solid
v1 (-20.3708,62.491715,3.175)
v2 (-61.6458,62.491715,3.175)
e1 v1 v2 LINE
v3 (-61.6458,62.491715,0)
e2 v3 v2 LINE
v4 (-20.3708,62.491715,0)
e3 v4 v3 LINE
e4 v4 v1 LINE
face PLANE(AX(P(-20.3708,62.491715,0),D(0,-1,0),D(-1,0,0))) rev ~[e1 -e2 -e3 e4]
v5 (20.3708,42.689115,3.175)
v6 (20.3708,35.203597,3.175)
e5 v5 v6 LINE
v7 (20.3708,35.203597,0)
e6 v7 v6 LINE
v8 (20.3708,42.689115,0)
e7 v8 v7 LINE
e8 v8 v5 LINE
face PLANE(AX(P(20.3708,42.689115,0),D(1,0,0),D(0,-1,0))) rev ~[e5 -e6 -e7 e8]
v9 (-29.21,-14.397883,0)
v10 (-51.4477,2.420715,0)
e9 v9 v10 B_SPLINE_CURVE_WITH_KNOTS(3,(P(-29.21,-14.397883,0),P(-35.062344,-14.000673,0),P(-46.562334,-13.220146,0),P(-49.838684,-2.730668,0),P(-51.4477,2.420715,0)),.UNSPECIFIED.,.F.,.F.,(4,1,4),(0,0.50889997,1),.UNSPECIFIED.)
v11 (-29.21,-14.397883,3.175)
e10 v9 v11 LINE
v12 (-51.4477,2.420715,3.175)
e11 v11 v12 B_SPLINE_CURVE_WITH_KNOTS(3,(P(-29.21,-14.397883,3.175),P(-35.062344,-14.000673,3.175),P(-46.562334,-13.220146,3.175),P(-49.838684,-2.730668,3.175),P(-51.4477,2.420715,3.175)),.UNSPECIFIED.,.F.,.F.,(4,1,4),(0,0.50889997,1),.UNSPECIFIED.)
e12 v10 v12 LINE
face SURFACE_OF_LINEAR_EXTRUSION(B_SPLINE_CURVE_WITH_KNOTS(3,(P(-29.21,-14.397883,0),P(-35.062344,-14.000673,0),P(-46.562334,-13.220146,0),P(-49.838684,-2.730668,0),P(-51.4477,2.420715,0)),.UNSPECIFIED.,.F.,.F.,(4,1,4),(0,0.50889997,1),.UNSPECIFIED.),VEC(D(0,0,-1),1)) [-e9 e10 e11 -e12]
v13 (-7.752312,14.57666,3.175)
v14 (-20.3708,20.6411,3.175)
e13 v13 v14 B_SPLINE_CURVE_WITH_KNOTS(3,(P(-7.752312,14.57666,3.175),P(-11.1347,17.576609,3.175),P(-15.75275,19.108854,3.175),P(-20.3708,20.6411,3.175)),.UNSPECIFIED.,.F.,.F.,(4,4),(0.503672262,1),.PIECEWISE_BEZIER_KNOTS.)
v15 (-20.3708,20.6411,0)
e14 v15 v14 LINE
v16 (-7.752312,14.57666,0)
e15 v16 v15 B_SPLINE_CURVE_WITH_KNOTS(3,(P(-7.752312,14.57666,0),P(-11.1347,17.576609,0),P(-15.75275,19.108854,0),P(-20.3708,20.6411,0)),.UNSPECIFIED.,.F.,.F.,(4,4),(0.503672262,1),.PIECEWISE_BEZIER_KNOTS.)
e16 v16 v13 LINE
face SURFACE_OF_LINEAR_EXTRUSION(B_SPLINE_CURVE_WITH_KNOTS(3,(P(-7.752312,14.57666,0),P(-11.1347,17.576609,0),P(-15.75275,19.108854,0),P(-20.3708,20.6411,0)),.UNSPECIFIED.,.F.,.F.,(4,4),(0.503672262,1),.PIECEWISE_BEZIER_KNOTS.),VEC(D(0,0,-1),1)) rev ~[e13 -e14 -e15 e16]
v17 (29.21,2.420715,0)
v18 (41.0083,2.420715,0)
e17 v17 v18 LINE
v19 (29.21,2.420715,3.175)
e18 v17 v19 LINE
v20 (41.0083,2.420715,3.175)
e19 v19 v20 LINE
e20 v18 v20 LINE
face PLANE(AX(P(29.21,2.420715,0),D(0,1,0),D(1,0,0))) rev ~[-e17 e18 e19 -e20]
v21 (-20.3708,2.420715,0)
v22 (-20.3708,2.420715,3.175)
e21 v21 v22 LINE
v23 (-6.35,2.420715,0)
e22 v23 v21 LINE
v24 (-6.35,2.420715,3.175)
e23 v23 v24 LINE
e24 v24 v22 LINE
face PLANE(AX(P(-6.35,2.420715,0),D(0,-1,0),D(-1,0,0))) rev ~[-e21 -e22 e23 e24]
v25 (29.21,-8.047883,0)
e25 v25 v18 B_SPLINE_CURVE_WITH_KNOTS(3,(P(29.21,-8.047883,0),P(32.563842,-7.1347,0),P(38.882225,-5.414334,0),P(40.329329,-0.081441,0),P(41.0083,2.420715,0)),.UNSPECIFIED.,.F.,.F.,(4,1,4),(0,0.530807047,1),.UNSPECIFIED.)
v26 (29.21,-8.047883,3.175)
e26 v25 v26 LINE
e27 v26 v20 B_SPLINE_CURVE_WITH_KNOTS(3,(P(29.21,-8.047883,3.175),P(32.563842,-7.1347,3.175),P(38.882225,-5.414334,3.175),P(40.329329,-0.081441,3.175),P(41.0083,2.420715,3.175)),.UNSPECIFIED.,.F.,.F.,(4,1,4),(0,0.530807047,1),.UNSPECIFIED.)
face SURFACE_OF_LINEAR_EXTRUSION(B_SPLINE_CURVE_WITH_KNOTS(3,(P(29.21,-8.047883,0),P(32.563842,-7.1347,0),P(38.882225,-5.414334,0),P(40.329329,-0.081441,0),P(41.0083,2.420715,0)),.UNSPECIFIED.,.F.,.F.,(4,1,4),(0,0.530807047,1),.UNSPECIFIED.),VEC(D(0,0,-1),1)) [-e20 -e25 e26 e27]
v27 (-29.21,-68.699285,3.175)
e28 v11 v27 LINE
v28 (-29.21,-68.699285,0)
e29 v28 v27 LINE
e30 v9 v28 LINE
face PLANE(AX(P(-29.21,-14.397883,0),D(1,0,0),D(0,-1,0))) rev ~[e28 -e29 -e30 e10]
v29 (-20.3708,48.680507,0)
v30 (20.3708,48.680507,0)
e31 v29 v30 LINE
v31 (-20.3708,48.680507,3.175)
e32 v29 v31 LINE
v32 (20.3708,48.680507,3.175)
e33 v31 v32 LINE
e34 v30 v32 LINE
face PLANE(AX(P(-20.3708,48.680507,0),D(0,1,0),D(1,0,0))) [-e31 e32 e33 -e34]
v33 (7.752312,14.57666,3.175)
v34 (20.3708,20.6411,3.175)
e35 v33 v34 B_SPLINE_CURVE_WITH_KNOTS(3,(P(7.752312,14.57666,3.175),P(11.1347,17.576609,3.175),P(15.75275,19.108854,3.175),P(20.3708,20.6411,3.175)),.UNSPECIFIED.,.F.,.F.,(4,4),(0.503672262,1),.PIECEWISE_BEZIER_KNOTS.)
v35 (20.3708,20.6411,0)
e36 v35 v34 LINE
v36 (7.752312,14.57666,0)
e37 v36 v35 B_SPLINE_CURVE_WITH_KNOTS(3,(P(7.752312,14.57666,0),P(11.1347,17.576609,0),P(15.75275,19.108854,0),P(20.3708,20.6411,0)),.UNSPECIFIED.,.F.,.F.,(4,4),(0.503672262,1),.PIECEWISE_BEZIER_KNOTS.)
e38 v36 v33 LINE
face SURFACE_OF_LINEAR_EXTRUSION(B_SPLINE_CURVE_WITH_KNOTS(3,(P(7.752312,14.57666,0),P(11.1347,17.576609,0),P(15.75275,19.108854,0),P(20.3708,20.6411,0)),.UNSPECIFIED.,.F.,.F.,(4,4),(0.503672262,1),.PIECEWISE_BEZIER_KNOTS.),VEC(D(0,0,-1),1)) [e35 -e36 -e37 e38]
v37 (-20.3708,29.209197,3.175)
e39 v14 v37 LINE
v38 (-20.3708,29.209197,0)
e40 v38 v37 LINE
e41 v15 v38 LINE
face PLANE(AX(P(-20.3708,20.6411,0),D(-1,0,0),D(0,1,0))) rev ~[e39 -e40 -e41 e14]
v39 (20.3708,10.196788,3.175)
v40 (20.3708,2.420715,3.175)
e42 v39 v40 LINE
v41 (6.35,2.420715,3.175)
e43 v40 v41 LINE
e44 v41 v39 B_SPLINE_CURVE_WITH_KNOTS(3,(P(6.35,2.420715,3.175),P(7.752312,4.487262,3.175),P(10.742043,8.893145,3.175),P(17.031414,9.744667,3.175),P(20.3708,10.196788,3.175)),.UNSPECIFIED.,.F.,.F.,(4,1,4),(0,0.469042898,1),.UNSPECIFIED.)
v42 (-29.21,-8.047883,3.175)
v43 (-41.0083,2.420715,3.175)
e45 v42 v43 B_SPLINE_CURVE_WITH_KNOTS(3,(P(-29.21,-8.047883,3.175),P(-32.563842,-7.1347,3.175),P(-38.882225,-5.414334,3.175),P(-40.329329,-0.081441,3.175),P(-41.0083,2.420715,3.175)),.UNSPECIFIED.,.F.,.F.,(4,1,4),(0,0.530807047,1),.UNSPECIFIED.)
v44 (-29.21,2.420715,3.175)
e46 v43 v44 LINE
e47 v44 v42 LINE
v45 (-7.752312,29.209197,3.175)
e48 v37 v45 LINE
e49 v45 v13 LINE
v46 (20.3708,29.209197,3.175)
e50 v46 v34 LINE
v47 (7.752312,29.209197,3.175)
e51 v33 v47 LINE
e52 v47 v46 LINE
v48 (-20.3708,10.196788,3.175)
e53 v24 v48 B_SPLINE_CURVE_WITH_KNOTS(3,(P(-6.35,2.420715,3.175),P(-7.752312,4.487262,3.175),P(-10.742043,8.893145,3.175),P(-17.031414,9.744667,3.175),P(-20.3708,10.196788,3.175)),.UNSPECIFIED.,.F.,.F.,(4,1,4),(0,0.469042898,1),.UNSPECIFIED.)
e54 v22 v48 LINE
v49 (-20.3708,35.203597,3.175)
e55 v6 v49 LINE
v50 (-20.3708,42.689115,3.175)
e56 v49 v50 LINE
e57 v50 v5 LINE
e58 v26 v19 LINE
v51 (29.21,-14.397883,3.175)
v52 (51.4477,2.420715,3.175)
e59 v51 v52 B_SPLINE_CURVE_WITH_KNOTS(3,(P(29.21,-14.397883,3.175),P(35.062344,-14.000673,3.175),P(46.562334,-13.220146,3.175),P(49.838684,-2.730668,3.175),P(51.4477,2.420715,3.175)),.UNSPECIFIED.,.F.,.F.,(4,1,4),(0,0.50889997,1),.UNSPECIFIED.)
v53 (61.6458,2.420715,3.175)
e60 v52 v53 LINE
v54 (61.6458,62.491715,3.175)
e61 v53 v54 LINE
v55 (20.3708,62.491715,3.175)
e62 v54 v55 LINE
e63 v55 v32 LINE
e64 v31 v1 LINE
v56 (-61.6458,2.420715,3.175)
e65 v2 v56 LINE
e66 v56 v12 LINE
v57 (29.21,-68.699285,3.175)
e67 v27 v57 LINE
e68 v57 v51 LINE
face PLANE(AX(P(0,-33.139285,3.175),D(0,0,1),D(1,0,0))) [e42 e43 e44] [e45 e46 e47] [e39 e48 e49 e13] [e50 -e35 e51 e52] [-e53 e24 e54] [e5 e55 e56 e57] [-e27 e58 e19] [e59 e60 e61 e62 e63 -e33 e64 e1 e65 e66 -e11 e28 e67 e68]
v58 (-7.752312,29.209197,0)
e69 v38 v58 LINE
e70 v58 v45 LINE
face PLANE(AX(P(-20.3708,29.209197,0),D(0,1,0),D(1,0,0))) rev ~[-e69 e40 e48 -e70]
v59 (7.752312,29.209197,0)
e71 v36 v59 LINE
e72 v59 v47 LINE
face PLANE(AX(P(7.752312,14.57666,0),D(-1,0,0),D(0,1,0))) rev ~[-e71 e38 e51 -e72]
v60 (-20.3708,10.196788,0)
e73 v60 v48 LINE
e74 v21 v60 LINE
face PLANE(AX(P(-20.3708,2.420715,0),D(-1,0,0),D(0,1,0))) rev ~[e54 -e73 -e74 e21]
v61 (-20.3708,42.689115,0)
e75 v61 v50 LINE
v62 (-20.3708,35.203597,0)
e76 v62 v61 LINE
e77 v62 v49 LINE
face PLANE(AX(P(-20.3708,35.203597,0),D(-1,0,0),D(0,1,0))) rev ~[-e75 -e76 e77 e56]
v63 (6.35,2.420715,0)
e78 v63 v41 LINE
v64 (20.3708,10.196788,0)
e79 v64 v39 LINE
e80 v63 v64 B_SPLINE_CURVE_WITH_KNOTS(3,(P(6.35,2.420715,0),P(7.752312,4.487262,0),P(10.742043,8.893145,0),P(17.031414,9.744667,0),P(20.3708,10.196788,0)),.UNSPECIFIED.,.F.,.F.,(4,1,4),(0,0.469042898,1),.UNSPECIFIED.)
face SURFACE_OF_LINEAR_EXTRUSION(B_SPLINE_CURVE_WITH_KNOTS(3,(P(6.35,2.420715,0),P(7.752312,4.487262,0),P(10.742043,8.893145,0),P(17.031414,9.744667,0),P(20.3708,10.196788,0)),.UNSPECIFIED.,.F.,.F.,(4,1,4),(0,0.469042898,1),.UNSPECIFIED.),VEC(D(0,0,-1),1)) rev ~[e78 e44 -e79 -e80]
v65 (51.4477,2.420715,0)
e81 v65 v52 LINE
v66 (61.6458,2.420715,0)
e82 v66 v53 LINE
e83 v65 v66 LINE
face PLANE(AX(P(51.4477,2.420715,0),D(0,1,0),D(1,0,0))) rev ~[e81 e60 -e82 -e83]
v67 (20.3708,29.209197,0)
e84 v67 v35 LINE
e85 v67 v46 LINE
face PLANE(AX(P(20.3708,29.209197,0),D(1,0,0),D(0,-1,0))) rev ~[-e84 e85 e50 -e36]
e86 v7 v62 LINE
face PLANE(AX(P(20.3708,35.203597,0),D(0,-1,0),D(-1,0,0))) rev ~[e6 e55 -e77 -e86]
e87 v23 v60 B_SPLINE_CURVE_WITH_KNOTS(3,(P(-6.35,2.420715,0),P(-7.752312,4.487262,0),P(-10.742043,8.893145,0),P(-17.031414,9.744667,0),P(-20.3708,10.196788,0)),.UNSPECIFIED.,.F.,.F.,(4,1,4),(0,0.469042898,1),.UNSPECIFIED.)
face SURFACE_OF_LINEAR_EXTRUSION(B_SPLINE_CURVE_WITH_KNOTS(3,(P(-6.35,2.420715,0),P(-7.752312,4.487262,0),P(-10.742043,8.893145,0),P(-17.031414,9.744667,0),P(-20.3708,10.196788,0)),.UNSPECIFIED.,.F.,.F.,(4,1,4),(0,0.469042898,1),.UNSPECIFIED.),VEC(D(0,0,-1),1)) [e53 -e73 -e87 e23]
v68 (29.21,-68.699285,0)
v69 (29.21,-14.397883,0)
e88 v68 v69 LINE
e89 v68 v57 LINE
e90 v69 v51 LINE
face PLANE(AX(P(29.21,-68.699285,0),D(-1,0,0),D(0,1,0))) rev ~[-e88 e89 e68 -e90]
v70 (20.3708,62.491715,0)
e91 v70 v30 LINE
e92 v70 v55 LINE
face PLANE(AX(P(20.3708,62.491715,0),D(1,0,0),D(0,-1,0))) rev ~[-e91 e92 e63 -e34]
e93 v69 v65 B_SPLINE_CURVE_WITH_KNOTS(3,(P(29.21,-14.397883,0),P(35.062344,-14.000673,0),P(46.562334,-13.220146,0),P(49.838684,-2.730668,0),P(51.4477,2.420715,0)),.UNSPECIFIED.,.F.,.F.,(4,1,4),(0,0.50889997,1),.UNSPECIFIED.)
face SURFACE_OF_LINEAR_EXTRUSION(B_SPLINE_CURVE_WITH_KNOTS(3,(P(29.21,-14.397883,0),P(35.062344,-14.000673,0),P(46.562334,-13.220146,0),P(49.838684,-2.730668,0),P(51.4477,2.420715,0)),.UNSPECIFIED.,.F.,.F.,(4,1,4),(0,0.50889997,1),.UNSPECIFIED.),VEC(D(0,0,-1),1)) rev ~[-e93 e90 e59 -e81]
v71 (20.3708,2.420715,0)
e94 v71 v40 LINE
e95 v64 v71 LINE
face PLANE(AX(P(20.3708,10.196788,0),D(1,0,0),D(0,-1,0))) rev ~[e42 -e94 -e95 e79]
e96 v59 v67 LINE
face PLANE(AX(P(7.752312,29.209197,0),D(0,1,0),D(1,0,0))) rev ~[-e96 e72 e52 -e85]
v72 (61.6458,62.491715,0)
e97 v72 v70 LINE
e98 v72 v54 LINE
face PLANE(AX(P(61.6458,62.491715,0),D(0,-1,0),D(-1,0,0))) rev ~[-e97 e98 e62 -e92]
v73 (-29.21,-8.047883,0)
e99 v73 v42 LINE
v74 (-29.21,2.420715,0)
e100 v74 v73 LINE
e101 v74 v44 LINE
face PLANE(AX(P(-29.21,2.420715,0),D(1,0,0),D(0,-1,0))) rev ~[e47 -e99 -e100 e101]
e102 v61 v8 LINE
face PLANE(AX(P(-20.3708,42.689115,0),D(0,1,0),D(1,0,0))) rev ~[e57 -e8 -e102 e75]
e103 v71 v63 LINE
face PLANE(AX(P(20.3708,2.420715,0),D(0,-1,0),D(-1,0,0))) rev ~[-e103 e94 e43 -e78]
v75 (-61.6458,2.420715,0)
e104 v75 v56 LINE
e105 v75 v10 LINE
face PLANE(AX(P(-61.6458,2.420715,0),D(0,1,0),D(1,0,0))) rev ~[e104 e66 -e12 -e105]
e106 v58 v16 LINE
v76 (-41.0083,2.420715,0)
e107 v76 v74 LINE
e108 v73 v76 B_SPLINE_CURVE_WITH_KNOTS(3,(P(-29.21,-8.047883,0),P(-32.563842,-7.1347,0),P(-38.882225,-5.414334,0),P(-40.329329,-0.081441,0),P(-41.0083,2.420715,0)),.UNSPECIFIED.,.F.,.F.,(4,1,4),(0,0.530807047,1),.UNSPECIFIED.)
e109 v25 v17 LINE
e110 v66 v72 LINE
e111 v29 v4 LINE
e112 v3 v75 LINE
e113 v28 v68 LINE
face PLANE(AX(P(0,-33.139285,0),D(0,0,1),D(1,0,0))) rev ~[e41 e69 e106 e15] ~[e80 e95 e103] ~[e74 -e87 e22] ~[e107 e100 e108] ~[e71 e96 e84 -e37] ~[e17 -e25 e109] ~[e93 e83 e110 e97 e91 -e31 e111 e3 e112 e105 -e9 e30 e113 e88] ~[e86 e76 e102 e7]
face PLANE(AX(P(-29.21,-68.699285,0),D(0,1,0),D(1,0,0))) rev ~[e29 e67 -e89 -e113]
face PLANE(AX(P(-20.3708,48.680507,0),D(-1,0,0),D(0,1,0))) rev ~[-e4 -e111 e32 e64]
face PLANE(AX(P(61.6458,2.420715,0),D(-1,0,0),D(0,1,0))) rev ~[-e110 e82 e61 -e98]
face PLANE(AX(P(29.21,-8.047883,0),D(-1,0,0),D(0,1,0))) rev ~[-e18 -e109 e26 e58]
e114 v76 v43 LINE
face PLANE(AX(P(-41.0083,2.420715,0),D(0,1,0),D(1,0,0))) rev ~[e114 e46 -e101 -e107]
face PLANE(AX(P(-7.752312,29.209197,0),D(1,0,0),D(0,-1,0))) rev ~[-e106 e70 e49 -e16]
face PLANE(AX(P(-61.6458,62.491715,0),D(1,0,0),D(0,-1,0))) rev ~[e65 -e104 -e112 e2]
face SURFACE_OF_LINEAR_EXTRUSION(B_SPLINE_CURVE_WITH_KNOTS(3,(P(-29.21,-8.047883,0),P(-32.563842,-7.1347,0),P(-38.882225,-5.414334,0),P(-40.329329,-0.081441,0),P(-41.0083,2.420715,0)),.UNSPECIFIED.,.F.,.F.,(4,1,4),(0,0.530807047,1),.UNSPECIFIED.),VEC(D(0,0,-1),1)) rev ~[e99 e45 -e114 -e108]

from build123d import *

# Parameters (mm, degrees)
F0_W     = 40.7416
F0_H     = 5.9913918376
F1_DEPTH = 3.175


# Not quite as in the source:
# - a feature names something its author has since deleted; it is built from what else it names


with BuildPart() as f1:
    # F0 (on Top) → F1 (new body)
    with BuildSketch(Plane.XY):
        Polygon((6.35, 2.420714612), (0, 2.420714612), (-6.35, 2.420714612), (-20.3708, 2.420714612), (-22.9107162118, 2.420714612), (-29.21, 2.420714612), (-29.21, -8.0478828564), (-29.21, -14.3978828564), (-29.21, -68.699285388), (29.21, -68.699285388), (29.21, -14.3978828564), (29.21, -8.0478828564), (29.21, 2.420714612), (20.3708, 2.420714612), align=None)
        Polygon((20.3708, 10.1967882365), (20.3708, 2.420714612), (29.21, 2.420714612), (41.0083, 2.420714612), (51.4477, 2.420714612), (61.6458, 2.420714612), (61.6458, 62.491714612), (20.3708, 62.491714612), (20.3708, 48.6805066466), (20.3708, 42.689114809), (20.3708, 35.2035965675), (20.3708, 29.2091965675), (20.3708, 20.6410996616), align=None)
        Polygon((-22.9107162118, 2.420714612), (-20.3708, 2.420714612), (-20.3708, 10.1967882365), (-20.3708, 20.6410996616), (-20.3708, 29.2091965675), (-20.3708, 35.2035965675), (-20.3708, 42.689114809), (-20.3708, 48.6805066466), (-20.3708, 62.491714612), (-61.6458, 62.491714612), (-61.6458, 2.420714612), (-51.4477, 2.420714612), (-41.0083, 2.420714612), (-29.21, 2.420714612), align=None)
        with BuildLine():
            add(Edge.make_bspline(
                [(29.21, -8.0478828564), (32.5638420451, -7.1347003919), (38.8822247108, -5.4143342635), (40.3293289084, -0.0814412218), (41.0083, 2.420714612)],
                knots=[0, 0, 0, 0, 0.5308070471, 1, 1, 1, 1], degree=3))
            Line((29.21, -8.0478828564), (29.21, -14.3978828564))
            add(Edge.make_bspline(
                [(29.21, -14.3978828564), (35.0623442189, -14.0006727781), (46.562333527, -13.2201459527), (49.8386841247, -2.7306682151), (51.4477, 2.420714612)],
                knots=[0, 0, 0, 0, 0.5088999704, 1, 1, 1, 1], degree=3))
            Line((51.4477, 2.420714612), (41.0083, 2.420714612))
        make_face()
        with BuildLine():
            Line((-29.21, -14.3978828564), (-29.21, -8.0478828564))
            add(Edge.make_bspline(
                [(-29.21, -8.0478828564), (-32.5638420451, -7.1347003919), (-38.8822247108, -5.4143342635), (-40.3293289084, -0.0814412218), (-41.0083, 2.420714612)],
                knots=[0, 0, 0, 0, 0.5308070471, 1, 1, 1, 1], degree=3))
            Line((-41.0083, 2.420714612), (-51.4477, 2.420714612))
            add(Edge.make_bspline(
                [(-29.21, -14.3978828564), (-35.0623442189, -14.0006727781), (-46.562333527, -13.2201459527), (-49.8386841247, -2.7306682151), (-51.4477, 2.420714612)],
                knots=[0, 0, 0, 0, 0.5088999704, 1, 1, 1, 1], degree=3))
        make_face()
        with Locations((0, 45.6848107278)):
            Rectangle(F0_W, F0_H)
        with BuildLine():
            Line((-6.35, 2.420714612), (0, 2.420714612))
            add(Edge.make_bspline(
                [(0, 2.420714612), (-2.1599363926, 6.9765171348), (-4.3198727852, 11.5323196577), (-7.7523121432, 14.5766604692)],
                knots=[0, 0, 0, 0, 0.5036722623, 0.5036722623, 0.5036722623, 0.5036722623], degree=3))
            add(Edge.make_bspline(
                [(-7.7523121432, 14.5766604692), (-11.1346998365, 17.5766088502), (-15.7527499182, 19.1088542559), (-20.3708, 20.6410996616)],
                knots=[0.5036722623, 0.5036722623, 0.5036722623, 0.5036722623, 1, 1, 1, 1], degree=3))
            Line((-20.3708, 20.6410996616), (-20.3708, 10.1967882365))
            add(Edge.make_bspline(
                [(-6.35, 2.420714612), (-7.7523121432, 4.4872624945), (-10.7420432518, 8.8931449662), (-17.0314139567, 9.7446667159), (-20.3708, 10.1967882365)],
                knots=[0, 0, 0, 0, 0.4690428979, 1, 1, 1, 1], degree=3))
        make_face()
        with BuildLine():
            add(Edge.make_bspline(
                [(0, 2.420714612), (2.1599363926, 6.9765171348), (4.3198727852, 11.5323196577), (7.7523121432, 14.5766604692)],
                knots=[0, 0, 0, 0, 0.5036722623, 0.5036722623, 0.5036722623, 0.5036722623], degree=3))
            Line((0, 2.420714612), (6.35, 2.420714612))
            add(Edge.make_bspline(
                [(6.35, 2.420714612), (7.7523121432, 4.4872624945), (10.7420432518, 8.8931449662), (17.0314139567, 9.7446667159), (20.3708, 10.1967882365)],
                knots=[0, 0, 0, 0, 0.4690428979, 1, 1, 1, 1], degree=3))
            Line((20.3708, 10.1967882365), (20.3708, 20.6410996616))
            add(Edge.make_bspline(
                [(7.7523121432, 14.5766604692), (11.1346998365, 17.5766088502), (15.7527499182, 19.1088542559), (20.3708, 20.6410996616)],
                knots=[0.5036722623, 0.5036722623, 0.5036722623, 0.5036722623, 1, 1, 1, 1], degree=3))
        make_face()
        with BuildLine():
            add(Edge.make_bspline(
                [(0, 2.420714612), (-2.1599363926, 6.9765171348), (-4.3198727852, 11.5323196577), (-7.7523121432, 14.5766604692)],
                knots=[0, 0, 0, 0, 0.5036722623, 0.5036722623, 0.5036722623, 0.5036722623], degree=3))
            add(Edge.make_bspline(
                [(0, 2.420714612), (2.1599363926, 6.9765171348), (4.3198727852, 11.5323196577), (7.7523121432, 14.5766604692)],
                knots=[0, 0, 0, 0, 0.5036722623, 0.5036722623, 0.5036722623, 0.5036722623], degree=3))
            Line((7.7523121432, 14.5766604692), (7.7523121432, 29.2091965675))
            Line((7.7523121432, 29.2091965675), (-7.7523121432, 29.2091965675))
            Line((-7.7523121432, 29.2091965675), (-7.7523121432, 14.5766604692))
        make_face()
        Polygon((-7.7523121432, 29.2091965675), (7.7523121432, 29.2091965675), (20.3708, 29.2091965675), (20.3708, 35.2035965675), (-20.3708, 35.2035965675), (-20.3708, 29.2091965675), align=None)
    extrude(amount=F1_DEPTH)


solid = f1.part
